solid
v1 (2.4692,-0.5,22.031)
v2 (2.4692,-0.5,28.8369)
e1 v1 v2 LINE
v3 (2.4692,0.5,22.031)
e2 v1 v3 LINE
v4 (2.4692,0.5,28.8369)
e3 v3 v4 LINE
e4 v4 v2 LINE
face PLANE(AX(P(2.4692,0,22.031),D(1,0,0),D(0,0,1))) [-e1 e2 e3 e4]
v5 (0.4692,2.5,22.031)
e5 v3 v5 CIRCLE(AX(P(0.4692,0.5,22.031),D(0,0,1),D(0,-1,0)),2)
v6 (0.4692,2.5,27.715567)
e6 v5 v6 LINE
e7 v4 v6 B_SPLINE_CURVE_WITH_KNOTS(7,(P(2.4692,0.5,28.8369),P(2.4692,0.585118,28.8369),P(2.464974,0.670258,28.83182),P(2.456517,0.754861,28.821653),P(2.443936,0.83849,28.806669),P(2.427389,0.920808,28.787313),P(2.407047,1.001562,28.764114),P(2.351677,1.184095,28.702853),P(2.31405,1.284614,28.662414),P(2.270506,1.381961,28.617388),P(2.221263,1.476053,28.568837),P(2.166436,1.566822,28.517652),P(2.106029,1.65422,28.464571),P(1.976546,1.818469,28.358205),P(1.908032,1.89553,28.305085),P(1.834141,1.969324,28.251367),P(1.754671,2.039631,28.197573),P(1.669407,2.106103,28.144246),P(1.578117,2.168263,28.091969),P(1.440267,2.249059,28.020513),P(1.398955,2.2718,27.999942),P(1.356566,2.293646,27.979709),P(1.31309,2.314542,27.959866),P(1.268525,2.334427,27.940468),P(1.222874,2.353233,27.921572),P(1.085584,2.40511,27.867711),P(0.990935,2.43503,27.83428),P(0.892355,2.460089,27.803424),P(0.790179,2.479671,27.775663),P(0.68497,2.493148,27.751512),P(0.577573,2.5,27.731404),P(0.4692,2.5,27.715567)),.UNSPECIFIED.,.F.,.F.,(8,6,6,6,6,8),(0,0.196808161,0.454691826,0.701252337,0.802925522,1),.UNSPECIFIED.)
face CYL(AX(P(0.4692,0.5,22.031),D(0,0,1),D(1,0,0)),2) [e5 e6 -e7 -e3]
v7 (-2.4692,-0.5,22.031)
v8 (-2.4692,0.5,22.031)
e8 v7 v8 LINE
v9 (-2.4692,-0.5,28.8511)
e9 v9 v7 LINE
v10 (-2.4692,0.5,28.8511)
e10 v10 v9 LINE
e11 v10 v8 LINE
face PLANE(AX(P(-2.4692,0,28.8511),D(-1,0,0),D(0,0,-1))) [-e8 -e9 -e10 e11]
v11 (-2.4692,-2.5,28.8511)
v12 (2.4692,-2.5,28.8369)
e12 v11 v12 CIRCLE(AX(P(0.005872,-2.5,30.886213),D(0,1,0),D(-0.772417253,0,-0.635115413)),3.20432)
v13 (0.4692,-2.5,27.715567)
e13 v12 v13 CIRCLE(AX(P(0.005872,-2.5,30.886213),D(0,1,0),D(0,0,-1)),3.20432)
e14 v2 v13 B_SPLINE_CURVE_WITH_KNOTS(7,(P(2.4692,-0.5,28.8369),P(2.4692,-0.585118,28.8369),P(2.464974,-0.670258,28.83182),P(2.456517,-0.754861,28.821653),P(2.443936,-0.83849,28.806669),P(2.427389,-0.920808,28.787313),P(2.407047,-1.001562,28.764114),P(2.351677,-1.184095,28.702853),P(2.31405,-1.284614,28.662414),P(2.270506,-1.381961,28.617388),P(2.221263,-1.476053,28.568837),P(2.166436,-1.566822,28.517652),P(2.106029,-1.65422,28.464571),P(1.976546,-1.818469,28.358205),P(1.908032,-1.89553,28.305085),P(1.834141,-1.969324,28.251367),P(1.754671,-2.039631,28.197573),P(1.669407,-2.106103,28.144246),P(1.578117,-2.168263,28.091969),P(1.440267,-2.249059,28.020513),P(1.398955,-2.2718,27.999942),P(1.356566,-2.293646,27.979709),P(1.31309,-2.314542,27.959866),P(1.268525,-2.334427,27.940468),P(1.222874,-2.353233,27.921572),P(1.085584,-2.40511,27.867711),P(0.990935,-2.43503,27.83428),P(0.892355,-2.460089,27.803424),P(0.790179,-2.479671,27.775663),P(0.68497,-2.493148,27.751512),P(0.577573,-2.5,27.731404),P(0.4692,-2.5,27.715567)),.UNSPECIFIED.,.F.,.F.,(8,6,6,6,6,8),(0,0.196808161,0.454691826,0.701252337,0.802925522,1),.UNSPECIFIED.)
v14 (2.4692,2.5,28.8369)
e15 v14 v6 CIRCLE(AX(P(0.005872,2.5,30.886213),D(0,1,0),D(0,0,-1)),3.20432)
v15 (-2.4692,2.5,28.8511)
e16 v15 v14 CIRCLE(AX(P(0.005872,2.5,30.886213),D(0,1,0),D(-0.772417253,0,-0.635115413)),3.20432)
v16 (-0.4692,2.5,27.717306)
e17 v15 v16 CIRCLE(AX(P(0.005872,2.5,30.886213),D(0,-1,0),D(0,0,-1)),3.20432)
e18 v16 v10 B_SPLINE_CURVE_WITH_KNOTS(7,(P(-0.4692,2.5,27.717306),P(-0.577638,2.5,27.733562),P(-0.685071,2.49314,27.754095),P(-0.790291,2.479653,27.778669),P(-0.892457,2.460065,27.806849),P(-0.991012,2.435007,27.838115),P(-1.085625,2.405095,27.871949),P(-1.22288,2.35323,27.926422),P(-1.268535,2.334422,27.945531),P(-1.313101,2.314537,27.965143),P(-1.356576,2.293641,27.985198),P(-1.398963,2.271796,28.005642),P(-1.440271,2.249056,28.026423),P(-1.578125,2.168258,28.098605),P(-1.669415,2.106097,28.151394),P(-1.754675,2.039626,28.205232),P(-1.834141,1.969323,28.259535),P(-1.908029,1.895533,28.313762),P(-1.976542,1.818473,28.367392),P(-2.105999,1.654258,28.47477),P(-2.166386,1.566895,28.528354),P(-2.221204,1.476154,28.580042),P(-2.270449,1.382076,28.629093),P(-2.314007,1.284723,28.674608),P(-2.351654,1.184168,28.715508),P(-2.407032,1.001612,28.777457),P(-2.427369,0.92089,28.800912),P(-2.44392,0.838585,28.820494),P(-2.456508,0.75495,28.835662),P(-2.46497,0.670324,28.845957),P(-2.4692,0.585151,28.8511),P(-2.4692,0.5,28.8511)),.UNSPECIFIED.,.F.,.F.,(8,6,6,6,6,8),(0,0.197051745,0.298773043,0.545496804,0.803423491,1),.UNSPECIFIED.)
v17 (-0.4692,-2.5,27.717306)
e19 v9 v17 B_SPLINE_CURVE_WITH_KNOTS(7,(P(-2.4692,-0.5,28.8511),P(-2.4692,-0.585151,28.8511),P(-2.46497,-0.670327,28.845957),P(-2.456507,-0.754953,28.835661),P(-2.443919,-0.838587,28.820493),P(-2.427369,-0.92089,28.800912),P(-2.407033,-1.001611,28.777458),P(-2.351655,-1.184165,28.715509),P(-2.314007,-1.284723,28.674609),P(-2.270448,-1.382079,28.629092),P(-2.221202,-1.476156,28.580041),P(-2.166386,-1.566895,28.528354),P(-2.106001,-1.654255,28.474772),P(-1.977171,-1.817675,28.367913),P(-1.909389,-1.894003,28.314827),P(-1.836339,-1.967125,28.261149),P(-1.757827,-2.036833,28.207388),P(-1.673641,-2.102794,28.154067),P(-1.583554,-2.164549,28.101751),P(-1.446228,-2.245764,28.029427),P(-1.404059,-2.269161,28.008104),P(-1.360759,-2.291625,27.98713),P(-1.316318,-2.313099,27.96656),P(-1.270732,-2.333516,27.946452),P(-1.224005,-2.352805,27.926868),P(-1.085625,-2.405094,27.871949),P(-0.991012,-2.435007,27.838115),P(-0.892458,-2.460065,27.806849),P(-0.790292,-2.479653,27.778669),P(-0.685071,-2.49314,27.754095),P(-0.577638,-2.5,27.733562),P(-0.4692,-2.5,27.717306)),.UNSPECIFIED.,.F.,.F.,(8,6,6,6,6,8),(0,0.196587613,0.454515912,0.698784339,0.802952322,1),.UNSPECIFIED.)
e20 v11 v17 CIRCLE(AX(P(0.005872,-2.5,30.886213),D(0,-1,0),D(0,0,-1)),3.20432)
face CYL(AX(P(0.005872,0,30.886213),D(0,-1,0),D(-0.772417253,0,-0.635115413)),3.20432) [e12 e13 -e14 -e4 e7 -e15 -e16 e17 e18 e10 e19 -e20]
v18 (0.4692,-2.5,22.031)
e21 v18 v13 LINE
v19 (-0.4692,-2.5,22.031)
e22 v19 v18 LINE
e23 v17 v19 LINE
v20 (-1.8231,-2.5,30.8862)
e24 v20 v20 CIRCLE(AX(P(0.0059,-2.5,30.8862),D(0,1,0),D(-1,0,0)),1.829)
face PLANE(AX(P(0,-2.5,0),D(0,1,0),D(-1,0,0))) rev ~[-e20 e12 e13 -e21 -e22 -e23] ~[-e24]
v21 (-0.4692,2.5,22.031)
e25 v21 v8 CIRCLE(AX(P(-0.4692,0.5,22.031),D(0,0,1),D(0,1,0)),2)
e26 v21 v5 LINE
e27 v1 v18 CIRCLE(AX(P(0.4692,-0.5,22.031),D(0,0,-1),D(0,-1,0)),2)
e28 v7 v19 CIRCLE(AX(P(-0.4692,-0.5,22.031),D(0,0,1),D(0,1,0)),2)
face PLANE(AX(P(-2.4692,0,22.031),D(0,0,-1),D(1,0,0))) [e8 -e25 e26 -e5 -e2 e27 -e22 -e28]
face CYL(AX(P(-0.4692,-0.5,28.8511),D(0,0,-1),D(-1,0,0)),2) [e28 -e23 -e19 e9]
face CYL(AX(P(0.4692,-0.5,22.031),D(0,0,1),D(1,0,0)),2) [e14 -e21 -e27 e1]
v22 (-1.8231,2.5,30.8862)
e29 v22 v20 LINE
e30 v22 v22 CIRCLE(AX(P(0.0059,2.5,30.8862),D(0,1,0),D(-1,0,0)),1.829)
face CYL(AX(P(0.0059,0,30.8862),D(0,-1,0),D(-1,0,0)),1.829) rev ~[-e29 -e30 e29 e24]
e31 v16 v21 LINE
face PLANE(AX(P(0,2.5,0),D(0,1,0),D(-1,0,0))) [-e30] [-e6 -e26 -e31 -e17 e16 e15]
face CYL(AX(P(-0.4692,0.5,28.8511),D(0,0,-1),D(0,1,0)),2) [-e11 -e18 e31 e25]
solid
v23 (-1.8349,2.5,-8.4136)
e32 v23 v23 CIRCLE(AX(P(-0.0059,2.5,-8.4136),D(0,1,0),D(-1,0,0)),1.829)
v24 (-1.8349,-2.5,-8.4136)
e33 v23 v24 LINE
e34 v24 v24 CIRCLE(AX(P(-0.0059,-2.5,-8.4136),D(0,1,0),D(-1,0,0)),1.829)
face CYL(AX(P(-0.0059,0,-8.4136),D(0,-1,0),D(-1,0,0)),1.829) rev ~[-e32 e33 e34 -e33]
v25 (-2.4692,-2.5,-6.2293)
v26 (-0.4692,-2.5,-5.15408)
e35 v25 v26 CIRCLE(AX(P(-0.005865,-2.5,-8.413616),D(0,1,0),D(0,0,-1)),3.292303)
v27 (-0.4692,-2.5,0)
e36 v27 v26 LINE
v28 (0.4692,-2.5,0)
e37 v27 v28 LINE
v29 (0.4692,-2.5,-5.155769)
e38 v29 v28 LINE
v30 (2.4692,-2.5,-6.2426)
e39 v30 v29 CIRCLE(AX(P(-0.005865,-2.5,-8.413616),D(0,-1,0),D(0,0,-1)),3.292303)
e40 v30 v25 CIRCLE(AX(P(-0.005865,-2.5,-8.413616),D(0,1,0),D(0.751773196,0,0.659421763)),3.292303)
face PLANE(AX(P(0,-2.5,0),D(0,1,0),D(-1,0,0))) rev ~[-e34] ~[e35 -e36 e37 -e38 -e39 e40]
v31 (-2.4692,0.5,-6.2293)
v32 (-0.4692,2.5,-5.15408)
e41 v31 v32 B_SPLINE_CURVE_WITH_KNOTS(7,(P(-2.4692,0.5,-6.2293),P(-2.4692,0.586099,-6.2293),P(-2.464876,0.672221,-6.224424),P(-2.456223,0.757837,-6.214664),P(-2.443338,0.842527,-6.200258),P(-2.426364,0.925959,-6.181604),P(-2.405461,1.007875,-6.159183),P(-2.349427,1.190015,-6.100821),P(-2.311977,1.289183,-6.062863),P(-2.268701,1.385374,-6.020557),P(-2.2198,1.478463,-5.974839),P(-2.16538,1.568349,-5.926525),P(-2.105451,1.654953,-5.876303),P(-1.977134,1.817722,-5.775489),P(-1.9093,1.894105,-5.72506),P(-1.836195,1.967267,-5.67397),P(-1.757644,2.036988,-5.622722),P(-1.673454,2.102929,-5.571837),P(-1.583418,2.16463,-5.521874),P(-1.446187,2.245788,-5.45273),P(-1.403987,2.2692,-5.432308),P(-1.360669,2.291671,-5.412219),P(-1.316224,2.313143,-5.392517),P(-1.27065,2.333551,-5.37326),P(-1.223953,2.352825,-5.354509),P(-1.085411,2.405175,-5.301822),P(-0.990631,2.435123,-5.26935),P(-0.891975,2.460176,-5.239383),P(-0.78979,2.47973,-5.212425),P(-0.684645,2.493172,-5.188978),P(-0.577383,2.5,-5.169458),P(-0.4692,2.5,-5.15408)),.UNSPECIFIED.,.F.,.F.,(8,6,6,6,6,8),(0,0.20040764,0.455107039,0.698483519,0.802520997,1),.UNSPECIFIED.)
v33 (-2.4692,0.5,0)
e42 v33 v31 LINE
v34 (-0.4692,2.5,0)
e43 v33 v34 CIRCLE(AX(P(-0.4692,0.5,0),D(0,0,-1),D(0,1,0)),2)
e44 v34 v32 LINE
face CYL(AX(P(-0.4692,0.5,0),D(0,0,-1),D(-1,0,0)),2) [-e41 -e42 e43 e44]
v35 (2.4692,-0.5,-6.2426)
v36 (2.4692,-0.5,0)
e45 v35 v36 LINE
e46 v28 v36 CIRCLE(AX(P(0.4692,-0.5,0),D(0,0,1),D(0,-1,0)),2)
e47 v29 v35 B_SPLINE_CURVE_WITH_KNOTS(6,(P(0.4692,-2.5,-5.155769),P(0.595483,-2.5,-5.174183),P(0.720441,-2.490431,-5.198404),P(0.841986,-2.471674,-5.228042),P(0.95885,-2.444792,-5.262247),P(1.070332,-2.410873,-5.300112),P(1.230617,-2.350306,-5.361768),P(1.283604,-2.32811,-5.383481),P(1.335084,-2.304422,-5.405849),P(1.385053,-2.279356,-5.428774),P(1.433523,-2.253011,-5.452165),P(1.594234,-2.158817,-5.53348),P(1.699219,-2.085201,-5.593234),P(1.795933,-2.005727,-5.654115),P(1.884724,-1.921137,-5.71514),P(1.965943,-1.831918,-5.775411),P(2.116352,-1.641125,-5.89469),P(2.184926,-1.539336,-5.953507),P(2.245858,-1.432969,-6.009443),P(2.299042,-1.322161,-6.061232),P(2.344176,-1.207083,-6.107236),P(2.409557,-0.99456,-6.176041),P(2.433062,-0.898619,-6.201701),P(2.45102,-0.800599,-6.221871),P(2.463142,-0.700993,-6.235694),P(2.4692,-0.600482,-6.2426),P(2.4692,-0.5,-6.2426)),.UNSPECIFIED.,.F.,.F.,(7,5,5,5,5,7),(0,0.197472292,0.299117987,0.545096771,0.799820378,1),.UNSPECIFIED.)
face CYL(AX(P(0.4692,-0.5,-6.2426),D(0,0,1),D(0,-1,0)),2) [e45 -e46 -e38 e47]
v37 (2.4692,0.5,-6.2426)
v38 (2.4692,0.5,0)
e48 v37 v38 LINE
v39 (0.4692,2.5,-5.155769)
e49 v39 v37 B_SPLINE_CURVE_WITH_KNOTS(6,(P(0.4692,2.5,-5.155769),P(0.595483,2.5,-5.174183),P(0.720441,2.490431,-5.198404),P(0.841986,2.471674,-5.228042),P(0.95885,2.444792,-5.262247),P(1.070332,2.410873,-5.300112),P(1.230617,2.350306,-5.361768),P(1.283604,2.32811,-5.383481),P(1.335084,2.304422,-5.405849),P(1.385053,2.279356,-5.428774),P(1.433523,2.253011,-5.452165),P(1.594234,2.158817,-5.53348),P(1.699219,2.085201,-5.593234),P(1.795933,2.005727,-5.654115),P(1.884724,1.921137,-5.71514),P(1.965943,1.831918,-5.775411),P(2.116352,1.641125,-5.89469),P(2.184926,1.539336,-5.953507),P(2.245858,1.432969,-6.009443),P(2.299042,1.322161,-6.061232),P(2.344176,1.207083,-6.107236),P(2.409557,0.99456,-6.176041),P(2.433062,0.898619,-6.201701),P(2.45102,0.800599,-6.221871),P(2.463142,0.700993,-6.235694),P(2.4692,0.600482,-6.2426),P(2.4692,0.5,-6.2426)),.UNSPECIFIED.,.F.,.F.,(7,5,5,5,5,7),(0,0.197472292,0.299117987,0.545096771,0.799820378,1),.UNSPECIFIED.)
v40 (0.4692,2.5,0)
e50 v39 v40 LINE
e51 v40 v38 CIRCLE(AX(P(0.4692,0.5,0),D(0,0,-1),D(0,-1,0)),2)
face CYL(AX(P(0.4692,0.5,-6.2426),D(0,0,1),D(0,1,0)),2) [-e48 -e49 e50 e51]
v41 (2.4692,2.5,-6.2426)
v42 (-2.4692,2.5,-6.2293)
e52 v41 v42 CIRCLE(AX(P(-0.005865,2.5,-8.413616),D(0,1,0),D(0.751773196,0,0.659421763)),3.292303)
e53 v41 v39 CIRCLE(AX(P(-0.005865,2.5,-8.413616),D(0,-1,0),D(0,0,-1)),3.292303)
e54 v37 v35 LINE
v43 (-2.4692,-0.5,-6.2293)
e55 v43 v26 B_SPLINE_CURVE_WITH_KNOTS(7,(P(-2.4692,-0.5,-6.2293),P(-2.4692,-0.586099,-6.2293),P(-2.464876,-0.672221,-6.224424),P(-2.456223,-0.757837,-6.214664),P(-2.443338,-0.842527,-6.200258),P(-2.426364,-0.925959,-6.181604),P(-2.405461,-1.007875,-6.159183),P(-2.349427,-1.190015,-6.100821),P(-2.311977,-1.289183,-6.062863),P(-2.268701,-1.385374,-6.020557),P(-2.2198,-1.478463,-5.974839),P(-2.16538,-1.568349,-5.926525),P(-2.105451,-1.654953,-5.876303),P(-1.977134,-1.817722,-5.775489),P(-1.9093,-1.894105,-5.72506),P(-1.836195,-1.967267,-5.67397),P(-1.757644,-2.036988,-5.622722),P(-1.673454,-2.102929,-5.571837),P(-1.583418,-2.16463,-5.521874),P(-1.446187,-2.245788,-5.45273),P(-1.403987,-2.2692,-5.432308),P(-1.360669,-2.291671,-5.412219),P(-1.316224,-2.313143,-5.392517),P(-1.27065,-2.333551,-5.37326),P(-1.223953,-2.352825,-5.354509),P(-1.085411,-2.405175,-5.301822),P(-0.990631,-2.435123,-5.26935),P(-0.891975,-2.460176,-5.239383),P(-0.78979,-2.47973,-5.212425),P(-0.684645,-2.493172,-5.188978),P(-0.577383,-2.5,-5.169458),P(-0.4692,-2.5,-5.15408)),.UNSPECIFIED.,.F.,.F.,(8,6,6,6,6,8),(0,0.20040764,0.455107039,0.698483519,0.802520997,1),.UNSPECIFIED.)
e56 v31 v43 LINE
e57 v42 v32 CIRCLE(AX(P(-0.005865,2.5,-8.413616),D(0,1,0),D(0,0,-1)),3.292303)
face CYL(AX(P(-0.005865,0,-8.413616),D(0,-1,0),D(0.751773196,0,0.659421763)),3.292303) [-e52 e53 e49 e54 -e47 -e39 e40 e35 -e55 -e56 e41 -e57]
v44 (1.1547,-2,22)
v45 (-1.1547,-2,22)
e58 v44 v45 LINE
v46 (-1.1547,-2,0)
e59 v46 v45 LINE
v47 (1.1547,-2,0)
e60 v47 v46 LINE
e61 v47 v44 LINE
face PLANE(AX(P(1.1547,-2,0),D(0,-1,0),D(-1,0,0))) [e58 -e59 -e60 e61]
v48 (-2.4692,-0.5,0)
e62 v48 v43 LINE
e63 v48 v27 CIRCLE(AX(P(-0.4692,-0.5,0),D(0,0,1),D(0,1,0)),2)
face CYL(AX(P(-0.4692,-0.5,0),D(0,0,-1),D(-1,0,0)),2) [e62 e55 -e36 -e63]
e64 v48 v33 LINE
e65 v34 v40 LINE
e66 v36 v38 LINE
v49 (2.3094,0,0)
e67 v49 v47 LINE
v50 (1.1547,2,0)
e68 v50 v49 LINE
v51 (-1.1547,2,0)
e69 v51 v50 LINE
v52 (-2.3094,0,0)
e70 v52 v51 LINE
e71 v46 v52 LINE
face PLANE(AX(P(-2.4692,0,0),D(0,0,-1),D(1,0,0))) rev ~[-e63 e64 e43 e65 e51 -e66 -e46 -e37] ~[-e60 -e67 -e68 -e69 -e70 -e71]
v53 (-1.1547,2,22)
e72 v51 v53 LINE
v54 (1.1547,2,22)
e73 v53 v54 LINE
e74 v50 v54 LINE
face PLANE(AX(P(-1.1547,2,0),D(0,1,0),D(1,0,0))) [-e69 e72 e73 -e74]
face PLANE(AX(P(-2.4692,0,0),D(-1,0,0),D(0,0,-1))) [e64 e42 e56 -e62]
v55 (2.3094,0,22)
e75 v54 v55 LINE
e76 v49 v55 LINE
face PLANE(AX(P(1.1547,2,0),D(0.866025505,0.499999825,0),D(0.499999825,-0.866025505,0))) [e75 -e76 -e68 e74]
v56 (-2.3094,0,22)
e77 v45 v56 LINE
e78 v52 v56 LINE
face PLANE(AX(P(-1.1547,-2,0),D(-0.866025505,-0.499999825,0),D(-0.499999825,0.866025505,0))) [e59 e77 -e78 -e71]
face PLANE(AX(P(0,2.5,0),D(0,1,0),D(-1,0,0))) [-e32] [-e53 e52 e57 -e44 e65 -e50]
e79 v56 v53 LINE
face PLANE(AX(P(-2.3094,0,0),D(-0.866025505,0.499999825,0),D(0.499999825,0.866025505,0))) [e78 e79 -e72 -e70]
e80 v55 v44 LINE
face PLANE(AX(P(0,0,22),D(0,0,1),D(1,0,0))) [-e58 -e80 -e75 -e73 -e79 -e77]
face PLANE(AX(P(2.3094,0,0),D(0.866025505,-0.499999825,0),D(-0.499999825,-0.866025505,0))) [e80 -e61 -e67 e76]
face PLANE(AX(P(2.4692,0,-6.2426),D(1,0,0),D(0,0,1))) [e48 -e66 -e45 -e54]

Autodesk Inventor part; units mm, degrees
ref_plane "YZ Plane" through (0, 0, 0) normal (1, 0, 0) x (0, 1, 0)
ref_plane "XZ Plane" through (0, 0, 0) normal (0, 1, 0) x (-1, 0, 0)
ref_plane "XY Plane" through (0, 0, 0) normal (0, 0, 1) x (1, 0, 0)
sketch "Sketch1" plane through (0, 0, 0) normal (0, 0, 1) x (1, 0, 0)
  line L0 (2.3094, 0) -> (1.1547, -2)
  line L1 (1.1547, -2) -> (-1.1547, -2)
  line L2 (-1.1547, -2) -> (-2.3094, 0)
  line L3 (-2.3094, 0) -> (-1.1547, 2)
  line L4 (-1.1547, 2) -> (1.1547, 2)
  line L5 (1.1547, 2) -> (2.3094, 0)
  point P0 (0, 0)
  point P1 (0, 0)
  point P2 (0, -2)
  dimension "d0" = 4
extrude "Extrusion1" add sketch "Sketch1" along normal blind 22
sketch "Sketch3" plane through (0, 0, 0) normal (0, 1, 0) x (-1, 0, 0)
  circle A0 centre (0.0059, -8.4136) radius 1.829
  line L0 (2.4692, 0) -> (2.4692, -6.2293)
  line L1 (-2.4692, -6.2426) -> (-2.4692, 0)
  arc A1 (-2.4692, -6.2426) -> (2.4692, -6.2293) centre (0.0059, -8.4136) ccw
  circle A2 centre (-0.0059, 30.8862) radius 1.829
  line L2 (-2.4692, 22.031) -> (-2.4692, 28.8369)
  line L3 (2.4692, 28.8511) -> (2.4692, 22.031)
  arc A3 (2.4692, 28.8511) -> (-2.4692, 28.8369) centre (-0.0059, 30.8862) ccw
  line L4 (1.1547, 22) -> (2.3094, 22) projected
  line L5 (2.4692, 22.031) -> (-2.4692, 22.031)
  line L6 (2.4692, 0) -> (-2.4692, 0)
  circle A4 centre (0.0059, -8.4136) radius 1.829
  line L7 (-1.1547, 22) -> (-2.3094, 22) projected
  line L8 (2.3094, 22) -> (-2.3094, 22)
  point P0 (1.1547, 34.4)
  point P1 (2.3094, 34.4)
extrude "Extrusion3" add sketch "Sketch3" along normal mid plane 5 contours L2 A3 L3 L5
extrude "Extrusion4" add sketch "Sketch3" along normal mid plane 5 contours L0 A1 L1 L6
fillet "Fillet1" radius 2 8 edges at (2.4692, 2.5, -3.1213) (-2.4692, 2.5, -3.1146) (2.4692, -2.5, -3.1213) (-2.4692, -2.5, -3.1146) (2.4692, -2.5, 25.4339) (2.4692, 2.5, 25.4339) (-2.4692, 2.5, 25.441) (-2.4692, -2.5, 25.441)
properties part number "PX9200-22"
